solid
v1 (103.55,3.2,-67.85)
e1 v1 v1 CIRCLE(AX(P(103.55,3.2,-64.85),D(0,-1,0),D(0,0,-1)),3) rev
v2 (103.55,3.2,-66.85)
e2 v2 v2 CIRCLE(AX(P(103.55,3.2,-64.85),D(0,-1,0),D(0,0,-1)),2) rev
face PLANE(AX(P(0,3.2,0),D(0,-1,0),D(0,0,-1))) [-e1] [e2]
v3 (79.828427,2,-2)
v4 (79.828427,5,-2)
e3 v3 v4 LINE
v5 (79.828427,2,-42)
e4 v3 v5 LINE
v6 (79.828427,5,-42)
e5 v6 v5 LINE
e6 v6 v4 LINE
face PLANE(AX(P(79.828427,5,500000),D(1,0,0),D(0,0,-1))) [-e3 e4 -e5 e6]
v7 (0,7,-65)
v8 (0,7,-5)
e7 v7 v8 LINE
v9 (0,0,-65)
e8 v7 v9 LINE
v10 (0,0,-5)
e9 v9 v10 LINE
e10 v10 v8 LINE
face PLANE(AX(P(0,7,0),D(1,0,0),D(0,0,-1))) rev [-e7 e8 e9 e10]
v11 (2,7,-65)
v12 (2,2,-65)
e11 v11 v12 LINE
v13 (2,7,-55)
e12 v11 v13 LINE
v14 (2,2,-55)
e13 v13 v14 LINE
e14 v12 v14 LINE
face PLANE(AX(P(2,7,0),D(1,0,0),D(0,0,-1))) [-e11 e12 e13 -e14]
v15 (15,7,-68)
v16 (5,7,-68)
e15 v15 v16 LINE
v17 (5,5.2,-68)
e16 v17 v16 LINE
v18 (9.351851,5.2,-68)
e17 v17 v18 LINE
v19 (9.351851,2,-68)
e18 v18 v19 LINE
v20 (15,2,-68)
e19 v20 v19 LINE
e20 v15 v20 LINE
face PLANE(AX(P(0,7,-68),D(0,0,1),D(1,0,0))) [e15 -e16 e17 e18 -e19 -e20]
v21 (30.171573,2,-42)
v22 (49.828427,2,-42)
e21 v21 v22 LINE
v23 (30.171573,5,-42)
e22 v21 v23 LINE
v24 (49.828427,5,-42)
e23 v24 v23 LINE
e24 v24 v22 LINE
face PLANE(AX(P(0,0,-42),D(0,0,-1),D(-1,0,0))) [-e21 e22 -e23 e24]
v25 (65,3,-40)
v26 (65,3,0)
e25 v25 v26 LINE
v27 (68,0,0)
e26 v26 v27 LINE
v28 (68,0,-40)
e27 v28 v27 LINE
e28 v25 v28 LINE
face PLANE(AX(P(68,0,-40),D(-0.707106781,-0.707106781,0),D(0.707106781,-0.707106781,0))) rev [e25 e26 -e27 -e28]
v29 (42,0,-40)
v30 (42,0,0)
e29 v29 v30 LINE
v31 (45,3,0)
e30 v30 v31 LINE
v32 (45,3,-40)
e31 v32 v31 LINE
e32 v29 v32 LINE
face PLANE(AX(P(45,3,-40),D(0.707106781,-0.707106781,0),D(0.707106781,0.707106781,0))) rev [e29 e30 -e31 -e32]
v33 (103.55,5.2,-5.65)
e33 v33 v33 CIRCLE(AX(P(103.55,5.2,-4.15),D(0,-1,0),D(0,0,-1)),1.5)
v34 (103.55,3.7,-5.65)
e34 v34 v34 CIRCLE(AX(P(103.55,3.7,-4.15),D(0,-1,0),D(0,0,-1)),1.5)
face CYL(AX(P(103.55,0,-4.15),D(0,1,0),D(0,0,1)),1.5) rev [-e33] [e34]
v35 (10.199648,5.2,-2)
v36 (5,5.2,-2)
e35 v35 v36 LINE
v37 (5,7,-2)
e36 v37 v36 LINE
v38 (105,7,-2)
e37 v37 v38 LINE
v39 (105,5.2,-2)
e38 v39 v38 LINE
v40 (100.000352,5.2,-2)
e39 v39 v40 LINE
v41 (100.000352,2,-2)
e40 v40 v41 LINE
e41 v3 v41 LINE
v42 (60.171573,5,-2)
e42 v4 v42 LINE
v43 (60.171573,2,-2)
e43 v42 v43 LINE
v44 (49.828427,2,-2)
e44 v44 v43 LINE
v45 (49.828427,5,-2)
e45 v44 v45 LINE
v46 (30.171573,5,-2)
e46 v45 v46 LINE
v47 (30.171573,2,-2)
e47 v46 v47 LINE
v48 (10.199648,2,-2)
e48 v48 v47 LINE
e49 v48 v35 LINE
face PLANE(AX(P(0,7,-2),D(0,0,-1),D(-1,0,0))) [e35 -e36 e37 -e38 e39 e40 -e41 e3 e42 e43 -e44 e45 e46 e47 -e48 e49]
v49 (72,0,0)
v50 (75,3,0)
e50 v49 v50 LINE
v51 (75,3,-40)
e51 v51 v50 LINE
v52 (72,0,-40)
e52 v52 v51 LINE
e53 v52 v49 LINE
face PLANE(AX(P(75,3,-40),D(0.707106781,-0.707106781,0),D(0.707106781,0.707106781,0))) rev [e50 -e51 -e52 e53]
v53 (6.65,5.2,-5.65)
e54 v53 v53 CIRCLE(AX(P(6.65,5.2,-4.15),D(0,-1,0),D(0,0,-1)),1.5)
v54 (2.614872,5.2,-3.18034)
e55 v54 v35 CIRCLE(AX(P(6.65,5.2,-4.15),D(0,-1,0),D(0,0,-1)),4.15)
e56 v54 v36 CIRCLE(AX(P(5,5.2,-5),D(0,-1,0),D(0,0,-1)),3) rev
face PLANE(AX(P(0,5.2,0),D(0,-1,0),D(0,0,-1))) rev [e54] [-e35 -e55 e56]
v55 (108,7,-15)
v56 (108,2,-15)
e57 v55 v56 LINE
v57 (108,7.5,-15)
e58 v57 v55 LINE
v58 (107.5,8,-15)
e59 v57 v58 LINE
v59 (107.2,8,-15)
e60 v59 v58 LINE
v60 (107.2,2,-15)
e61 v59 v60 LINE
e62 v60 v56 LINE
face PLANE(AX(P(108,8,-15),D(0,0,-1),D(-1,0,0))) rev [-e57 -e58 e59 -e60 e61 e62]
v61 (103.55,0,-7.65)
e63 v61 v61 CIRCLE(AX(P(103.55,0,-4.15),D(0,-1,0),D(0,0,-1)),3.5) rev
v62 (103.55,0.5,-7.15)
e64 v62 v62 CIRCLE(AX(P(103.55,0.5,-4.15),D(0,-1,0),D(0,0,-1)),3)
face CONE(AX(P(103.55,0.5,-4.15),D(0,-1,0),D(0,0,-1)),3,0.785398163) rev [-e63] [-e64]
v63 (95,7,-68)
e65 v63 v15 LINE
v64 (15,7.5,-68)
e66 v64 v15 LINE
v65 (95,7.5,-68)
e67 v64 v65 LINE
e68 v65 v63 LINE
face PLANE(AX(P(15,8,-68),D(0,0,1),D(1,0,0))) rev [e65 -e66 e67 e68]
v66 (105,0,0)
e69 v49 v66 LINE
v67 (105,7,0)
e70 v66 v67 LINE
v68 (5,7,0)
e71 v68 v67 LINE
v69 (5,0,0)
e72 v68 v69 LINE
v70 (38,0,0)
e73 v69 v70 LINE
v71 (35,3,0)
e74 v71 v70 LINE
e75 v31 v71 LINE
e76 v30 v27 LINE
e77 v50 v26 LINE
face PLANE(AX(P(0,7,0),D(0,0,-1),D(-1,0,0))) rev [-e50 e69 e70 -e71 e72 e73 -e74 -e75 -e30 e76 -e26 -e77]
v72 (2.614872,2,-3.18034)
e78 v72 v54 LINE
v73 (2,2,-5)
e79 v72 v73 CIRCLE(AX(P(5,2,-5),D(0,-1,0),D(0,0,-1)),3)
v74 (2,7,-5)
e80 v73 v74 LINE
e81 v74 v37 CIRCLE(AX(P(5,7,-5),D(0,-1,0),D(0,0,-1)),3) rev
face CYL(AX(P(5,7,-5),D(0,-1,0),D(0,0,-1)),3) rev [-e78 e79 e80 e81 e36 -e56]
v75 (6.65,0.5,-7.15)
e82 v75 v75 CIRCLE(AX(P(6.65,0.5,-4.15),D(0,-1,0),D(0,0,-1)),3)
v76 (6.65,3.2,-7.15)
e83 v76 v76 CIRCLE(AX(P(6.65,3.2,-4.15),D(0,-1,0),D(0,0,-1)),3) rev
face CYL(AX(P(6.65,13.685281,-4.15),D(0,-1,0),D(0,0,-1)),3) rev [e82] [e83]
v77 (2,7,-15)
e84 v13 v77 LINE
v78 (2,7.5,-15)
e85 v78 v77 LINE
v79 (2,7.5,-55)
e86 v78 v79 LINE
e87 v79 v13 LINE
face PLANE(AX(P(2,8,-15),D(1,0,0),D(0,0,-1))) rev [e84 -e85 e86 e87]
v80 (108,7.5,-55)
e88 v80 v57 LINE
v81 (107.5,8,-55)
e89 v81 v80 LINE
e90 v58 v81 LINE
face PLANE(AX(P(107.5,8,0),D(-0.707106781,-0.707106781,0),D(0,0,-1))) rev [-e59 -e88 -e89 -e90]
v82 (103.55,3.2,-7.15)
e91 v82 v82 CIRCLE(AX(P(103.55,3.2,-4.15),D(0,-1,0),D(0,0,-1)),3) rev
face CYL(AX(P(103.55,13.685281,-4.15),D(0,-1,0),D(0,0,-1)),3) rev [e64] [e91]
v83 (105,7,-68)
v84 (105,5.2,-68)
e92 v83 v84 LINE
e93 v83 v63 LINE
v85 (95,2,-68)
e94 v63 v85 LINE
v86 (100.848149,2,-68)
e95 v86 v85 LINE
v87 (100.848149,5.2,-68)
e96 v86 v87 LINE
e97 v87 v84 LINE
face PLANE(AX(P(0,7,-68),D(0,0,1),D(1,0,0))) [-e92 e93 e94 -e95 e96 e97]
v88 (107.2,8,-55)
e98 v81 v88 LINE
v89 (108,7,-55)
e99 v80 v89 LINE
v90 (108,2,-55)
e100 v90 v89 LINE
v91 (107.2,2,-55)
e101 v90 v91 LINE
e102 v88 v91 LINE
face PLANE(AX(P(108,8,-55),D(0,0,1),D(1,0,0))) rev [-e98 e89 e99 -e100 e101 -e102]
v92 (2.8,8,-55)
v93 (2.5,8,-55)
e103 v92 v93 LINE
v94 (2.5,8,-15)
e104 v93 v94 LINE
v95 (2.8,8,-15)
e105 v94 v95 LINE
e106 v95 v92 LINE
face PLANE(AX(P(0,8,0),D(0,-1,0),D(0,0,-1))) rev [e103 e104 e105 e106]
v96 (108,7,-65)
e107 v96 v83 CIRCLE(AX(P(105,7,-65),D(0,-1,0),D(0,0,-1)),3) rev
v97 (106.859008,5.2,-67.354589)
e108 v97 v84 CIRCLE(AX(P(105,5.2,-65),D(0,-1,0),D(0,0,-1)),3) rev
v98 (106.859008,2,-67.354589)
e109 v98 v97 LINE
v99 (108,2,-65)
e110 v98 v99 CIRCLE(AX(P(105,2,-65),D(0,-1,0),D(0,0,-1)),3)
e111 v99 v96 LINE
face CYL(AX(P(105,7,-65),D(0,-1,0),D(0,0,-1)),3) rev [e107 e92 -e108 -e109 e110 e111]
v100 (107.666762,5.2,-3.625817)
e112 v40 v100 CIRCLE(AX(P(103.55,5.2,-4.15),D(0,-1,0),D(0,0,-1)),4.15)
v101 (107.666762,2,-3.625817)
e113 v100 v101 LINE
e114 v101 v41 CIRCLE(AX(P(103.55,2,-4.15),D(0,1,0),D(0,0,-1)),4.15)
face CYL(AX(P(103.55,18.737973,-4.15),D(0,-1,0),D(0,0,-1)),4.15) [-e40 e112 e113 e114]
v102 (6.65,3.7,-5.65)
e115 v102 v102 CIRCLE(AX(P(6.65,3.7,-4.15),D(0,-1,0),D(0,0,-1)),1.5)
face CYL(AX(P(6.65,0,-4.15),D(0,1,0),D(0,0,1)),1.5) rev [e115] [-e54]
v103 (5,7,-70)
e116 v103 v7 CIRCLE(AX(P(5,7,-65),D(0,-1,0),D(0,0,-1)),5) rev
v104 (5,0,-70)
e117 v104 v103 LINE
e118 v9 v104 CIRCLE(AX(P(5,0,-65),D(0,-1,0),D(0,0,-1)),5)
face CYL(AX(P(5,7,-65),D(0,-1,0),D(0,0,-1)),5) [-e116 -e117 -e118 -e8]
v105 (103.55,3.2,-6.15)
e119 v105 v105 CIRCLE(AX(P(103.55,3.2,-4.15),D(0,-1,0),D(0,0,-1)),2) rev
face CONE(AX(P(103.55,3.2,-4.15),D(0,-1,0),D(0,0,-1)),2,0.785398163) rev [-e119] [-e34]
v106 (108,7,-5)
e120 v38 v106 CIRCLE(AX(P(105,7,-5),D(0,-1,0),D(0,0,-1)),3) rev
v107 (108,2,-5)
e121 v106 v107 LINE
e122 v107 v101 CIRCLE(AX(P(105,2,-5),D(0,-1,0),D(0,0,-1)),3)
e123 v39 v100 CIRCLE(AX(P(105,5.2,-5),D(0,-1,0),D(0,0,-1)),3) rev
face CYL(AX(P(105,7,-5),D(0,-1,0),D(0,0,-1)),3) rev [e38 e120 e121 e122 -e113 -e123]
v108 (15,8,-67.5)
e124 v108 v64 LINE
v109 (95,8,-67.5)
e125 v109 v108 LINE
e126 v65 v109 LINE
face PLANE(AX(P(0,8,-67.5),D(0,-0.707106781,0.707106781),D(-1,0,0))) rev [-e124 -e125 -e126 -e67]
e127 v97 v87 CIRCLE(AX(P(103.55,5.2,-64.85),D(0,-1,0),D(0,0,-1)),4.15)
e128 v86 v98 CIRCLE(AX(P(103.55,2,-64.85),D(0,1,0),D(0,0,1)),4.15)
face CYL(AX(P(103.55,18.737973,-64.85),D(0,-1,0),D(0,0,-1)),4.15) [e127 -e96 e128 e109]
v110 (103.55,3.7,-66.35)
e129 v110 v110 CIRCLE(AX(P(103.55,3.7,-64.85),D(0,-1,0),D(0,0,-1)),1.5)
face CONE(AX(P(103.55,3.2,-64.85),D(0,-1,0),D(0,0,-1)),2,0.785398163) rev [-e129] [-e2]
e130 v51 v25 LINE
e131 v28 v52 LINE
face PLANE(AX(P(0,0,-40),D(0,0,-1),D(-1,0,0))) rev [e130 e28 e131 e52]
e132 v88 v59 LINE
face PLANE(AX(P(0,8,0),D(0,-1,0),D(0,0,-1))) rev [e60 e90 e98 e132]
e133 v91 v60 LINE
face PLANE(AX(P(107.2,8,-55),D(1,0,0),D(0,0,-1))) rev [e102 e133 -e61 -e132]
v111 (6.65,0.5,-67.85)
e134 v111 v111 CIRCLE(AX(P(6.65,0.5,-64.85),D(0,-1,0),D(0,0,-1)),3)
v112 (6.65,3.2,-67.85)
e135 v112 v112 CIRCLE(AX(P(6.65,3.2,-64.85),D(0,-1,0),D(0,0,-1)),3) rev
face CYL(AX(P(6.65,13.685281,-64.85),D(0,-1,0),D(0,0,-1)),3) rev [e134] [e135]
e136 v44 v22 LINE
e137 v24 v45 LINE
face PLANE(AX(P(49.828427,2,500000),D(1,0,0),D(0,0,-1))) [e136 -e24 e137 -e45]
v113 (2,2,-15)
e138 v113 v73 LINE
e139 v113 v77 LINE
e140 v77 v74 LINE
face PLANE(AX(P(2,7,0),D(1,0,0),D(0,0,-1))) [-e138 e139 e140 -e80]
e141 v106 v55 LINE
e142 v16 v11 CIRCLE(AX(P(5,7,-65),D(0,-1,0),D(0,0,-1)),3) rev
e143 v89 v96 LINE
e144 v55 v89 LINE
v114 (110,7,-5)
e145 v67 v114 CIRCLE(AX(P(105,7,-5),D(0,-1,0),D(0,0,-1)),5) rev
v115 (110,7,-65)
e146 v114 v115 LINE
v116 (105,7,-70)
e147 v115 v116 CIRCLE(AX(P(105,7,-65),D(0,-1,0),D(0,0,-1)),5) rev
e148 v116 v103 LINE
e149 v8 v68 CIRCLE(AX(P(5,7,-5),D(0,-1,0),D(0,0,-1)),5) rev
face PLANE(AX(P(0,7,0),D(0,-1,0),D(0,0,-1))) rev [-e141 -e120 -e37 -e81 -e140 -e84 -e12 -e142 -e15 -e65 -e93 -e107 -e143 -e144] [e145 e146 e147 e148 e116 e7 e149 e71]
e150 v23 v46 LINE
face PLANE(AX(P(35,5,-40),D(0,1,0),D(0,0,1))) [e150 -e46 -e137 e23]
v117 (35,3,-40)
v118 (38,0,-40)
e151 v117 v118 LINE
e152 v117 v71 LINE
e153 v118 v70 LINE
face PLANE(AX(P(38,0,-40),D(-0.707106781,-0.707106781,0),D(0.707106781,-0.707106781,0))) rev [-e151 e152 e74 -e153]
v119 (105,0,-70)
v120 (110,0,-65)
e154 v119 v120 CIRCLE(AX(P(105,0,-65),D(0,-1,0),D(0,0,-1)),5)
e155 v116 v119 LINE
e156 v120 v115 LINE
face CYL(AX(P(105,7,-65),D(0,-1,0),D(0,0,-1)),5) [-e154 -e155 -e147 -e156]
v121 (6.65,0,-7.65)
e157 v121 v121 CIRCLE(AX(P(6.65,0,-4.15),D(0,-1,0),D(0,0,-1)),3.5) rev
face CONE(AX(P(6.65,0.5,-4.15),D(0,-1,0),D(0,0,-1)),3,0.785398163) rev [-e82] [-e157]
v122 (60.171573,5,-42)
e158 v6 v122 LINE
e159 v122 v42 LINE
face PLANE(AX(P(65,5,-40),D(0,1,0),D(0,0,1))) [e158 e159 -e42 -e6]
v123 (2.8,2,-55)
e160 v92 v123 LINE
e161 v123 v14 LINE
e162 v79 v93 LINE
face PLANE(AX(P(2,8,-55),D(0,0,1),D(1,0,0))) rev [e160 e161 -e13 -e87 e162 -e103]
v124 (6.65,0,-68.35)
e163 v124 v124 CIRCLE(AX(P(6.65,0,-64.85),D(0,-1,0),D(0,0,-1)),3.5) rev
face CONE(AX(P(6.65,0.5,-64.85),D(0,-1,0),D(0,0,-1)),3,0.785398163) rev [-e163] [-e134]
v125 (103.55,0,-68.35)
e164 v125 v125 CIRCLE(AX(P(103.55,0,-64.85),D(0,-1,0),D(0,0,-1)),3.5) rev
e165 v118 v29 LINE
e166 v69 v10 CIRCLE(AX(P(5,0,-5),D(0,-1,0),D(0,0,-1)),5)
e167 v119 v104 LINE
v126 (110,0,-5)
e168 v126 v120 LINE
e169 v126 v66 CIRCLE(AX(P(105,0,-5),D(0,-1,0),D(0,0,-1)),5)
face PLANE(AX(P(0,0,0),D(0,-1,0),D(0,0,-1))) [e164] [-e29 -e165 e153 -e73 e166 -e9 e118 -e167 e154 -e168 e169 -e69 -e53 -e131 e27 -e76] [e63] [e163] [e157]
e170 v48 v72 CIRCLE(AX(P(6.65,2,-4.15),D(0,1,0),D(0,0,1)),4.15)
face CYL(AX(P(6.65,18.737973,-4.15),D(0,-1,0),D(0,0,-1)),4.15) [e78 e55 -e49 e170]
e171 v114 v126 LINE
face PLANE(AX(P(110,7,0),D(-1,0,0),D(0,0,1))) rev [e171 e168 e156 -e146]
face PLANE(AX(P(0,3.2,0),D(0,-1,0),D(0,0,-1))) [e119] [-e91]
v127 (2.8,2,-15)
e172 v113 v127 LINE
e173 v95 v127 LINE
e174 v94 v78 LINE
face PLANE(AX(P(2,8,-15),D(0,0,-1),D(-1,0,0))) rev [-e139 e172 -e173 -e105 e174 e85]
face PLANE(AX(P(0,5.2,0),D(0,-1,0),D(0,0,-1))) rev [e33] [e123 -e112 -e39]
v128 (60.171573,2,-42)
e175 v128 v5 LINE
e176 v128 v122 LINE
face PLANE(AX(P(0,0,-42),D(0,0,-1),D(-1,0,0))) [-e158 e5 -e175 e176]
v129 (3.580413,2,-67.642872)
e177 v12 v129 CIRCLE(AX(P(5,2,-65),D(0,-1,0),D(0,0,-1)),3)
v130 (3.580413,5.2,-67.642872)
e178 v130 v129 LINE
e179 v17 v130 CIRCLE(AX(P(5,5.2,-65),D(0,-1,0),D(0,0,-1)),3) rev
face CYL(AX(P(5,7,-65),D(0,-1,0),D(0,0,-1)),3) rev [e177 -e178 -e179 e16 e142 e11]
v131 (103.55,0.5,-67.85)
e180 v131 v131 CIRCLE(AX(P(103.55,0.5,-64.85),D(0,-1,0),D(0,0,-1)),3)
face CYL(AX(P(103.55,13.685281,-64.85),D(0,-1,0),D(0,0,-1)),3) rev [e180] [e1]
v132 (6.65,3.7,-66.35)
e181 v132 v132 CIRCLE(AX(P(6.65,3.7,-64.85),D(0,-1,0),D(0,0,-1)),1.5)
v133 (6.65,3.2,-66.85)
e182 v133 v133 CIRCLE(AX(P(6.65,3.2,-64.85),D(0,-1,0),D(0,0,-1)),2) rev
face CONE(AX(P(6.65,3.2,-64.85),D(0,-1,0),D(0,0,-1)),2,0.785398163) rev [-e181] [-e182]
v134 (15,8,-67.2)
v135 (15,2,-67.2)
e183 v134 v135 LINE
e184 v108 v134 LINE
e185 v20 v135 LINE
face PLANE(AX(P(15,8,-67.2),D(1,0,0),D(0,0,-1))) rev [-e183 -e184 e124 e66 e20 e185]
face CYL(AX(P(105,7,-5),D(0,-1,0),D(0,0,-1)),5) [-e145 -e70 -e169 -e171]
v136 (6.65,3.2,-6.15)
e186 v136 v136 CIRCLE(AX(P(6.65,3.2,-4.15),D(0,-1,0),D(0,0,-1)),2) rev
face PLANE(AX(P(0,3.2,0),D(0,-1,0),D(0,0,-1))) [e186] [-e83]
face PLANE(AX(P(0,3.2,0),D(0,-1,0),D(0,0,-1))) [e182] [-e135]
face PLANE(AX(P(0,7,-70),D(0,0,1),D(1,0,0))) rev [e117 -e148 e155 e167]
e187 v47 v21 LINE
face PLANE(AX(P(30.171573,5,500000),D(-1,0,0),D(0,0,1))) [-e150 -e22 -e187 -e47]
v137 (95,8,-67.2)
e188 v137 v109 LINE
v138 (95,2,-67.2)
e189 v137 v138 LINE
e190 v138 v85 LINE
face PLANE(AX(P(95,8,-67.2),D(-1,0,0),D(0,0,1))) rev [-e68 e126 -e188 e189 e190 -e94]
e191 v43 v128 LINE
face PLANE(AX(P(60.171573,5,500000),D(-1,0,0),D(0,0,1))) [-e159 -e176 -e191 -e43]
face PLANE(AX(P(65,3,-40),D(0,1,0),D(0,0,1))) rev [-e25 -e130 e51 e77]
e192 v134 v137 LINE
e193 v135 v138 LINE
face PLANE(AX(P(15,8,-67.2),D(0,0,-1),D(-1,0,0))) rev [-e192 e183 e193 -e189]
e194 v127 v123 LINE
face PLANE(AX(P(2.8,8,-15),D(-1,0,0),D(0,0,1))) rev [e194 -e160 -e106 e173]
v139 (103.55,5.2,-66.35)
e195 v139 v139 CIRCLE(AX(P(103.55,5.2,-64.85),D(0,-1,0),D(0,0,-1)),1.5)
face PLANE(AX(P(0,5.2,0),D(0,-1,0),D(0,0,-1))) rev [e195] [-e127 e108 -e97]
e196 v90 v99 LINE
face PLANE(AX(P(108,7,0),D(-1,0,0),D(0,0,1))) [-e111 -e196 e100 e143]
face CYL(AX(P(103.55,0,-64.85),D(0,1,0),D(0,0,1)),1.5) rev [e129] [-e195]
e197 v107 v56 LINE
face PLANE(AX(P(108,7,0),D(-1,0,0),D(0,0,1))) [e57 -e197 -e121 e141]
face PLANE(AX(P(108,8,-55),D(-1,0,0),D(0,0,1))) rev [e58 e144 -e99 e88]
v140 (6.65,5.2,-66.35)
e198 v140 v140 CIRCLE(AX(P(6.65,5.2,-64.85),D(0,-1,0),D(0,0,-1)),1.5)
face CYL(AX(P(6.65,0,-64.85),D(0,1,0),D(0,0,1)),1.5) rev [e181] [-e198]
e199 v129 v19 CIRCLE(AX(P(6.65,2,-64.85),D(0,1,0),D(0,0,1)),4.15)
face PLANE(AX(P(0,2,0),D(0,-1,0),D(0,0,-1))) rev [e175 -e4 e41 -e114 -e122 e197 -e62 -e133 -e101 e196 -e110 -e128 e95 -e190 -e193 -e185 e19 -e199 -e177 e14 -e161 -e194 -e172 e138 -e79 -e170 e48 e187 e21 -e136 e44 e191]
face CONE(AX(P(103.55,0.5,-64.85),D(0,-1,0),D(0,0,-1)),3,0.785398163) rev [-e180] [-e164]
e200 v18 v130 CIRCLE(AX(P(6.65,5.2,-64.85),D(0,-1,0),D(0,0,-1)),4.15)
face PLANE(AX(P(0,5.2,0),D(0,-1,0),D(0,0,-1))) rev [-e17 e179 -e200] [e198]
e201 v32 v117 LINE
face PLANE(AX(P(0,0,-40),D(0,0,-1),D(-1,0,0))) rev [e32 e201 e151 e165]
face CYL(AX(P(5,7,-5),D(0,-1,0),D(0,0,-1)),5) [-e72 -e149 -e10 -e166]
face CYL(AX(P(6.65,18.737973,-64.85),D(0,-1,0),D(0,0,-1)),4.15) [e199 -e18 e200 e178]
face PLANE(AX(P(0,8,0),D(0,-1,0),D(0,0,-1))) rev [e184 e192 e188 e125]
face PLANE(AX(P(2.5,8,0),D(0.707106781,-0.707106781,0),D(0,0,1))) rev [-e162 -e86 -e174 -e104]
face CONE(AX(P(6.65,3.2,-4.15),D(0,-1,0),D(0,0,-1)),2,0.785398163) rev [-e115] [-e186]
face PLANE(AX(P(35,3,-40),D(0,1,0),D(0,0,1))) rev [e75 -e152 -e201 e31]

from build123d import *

# Parameters (mm, degrees)
SKETCH1_W               = 110
SKETCH1_H               = 70
BOSS_EXTRUDE1_DEPTH     = 7
FILLET1_R               = 5
CUT_EXTRUDE1_DEPTH      = 40
SHELL1_START            = 5
SHELL1_DEPTH            = 2
SHELL1_START_2          = 2
SHELL1_2_DEPTH          = 3
SHELL1_START_3          = -42
SHELL1_3_DEPTH          = 40
SHELL1_4_DEPTH          = 2
SKETCH2_W               = 80
SKETCH2_H               = 0.8
SKETCH2_W_2             = 0.8
SKETCH2_H_2             = 40
BOSS_EXTRUDE2_DEPTH     = 6
CHAMFER1_SIZE           = 0.5
SKETCH8_R               = 4.15
BOSS_EXTRUDE3_DEPTH     = 3.2
CUT_EXTRUDE5_DEPTH      = 131.48770057
CUT_EXTRUDE5_DEPTH_BACK = 131.48770057
SKETCH9_R               = 1.5
SKETCH10_R              = 3
CUT_EXTRUDE6_DEPTH      = 3.2
CHAMFER2_SIZE           = 0.5
BOSS_EXTRUDE4_REACH     = 120.017


with BuildPart() as part:
    # Sketch1 → Boss-Extrude1 (new body)
    with BuildSketch(Plane(origin=(0, 0, 0), x_dir=(1, 0, 0), z_dir=(0, 1, 0))):
        with Locations((55, 35)):
            Rectangle(SKETCH1_W, SKETCH1_H)
    extrude(amount=BOSS_EXTRUDE1_DEPTH)

    # Fillet1
    fillet1_edges = [part.edges().sort_by_distance(p)[0] for p in [
        (0, 3.5, -70),
        (110, 3.5, -70),
        (110, 3.5, 0),
        (0, 3.5, 0),
    ]]
    fillet(fillet1_edges, radius=FILLET1_R)

    # Sketch3 → Cut-Extrude1 (cut)
    with BuildSketch(Plane.XY):
        Polygon((38, 0), (35, 3), (45, 3), (42, 0), align=None)
        Polygon((68, 0), (65, 3), (75, 3), (72, 0), align=None)
    extrude(amount=-CUT_EXTRUDE1_DEPTH, mode=Mode.SUBTRACT)

    # Shell1: read off the stored shape, not the designer's step
    # Shell1 outline → Shell1 (cut)
    with BuildSketch(Plane(origin=(0, 0, 0), x_dir=(1, 0, 0), z_dir=(0, 1, 0)).offset(SHELL1_START)):
        with BuildLine():
            Line((2, 65), (2, 5))
            ThreePointArc((2, 5), (2.878679656, 2.878679656), (5, 2))
            Line((5, 2), (105, 2))
            ThreePointArc((105, 2), (107.121320344, 2.878679656), (108, 5))
            Line((108, 5), (108, 65))
            ThreePointArc((108, 65), (107.121320344, 67.121320344), (105, 68))
            Line((105, 68), (5, 68))
            ThreePointArc((5, 68), (2.878679656, 67.121320344), (2, 65))
        make_face()
    extrude(amount=SHELL1_DEPTH, mode=Mode.SUBTRACT)

    # Shell1 2 outline → Shell1 2 (cut)
    with BuildSketch(Plane(origin=(0, 0, 0), x_dir=(1, 0, 0), z_dir=(0, 1, 0)).offset(SHELL1_START_2)):
        with BuildLine():
            Line((2, 65), (2, 5))
            ThreePointArc((2, 5), (2.878679656, 2.878679656), (5, 2))
            Line((5, 2), (105, 2))
            ThreePointArc((105, 2), (107.121320344, 2.878679656), (108, 5))
            Line((108, 5), (108, 65))
            ThreePointArc((108, 65), (107.121320344, 67.121320344), (105, 68))
            Line((105, 68), (5, 68))
            ThreePointArc((5, 68), (2.878679656, 67.121320344), (2, 65))
        make_face()
    extrude(amount=SHELL1_2_DEPTH, mode=Mode.SUBTRACT)

    # Shell1 3 outline → Shell1 3 (add)
    with BuildSketch(Plane.XY.offset(SHELL1_START_3)):
        Polygon((36, 2), (35, 3), (45, 3), (44, 2), (46.828427125, 2), (49.828427125, 5), (30.171572875, 5), (33.171572875, 2), align=None)
        Polygon((60.171572875, 5), (63.171572875, 2), (66, 2), (65, 3), (75, 3), (74, 2), (76.828427125, 2), (79.828427125, 5), align=None)
    extrude(amount=SHELL1_3_DEPTH)

    # Shell1 4 outline → Shell1 4 (add)
    with BuildSketch(Plane.XY.offset(SHELL1_START_3)):
        Polygon((45, 3), (35, 3), (36, 2), (44, 2), align=None)
        Polygon((65, 3), (66, 2), (74, 2), (75, 3), align=None)
    extrude(amount=SHELL1_4_DEPTH)

    # Sketch2 → Boss-Extrude2 (add)
    with BuildSketch(Plane(origin=(0, 2, 0), x_dir=(1, 0, 0), z_dir=(0, 1, 0))):
        with Locations((55, 67.6)):
            Rectangle(SKETCH2_W, SKETCH2_H)
        with Locations((107.6, 35)):
            Rectangle(SKETCH2_W_2, SKETCH2_H_2)
        with Locations((2.4, 35)):
            Rectangle(SKETCH2_W_2, SKETCH2_H_2)
    extrude(amount=BOSS_EXTRUDE2_DEPTH)

    # Chamfer1
    chamfer1_edges = [part.edges().sort_by_distance(p)[0] for p in [
        (55, 8, -68),
        (108, 8, -35),
        (2, 8, -35),
    ]]
    chamfer(chamfer1_edges, length=CHAMFER1_SIZE)

    # Sketch8 → Boss-Extrude3 (add)
    with BuildSketch(Plane(origin=(0, 2, 0), x_dir=(1, 0, 0), z_dir=(0, 1, 0))):
        with Locations((103.55, 64.85)):
            Circle(SKETCH8_R)
        with Locations((6.65, 64.85)):
            Circle(SKETCH8_R)
        with Locations((6.65, 4.15)):
            Circle(SKETCH8_R)
        with Locations((103.55, 4.15)):
            Circle(SKETCH8_R)
    extrude(amount=BOSS_EXTRUDE3_DEPTH)

    # Sketch9 → Cut-Extrude5 (cut, two sides: drawn at the far end of the back side and taken through both)
    with BuildSketch(Plane(origin=(0, 5.2, 0), x_dir=(1, 0, 0), z_dir=(0, 1, 0)).offset(-CUT_EXTRUDE5_DEPTH_BACK)):
        with Locations(Location((6.65, 64.85, 0), (0, 0, 270))):
            Circle(SKETCH9_R)
        with Locations(Location((6.65, 4.15, 0), (0, 0, 270))):
            Circle(SKETCH9_R)
        with Locations(Location((103.55, 4.15, 0), (0, 0, 270))):
            Circle(SKETCH9_R)
        with Locations(Location((103.55, 64.85, 0), (0, 0, 270))):
            Circle(SKETCH9_R)
    extrude(amount=CUT_EXTRUDE5_DEPTH + CUT_EXTRUDE5_DEPTH_BACK, mode=Mode.SUBTRACT)

    # Sketch10 → Cut-Extrude6 (cut)
    with BuildSketch(Plane(origin=(0, 0, 0), x_dir=(-1, 0, 0), z_dir=(0, -1, 0))):
        with Locations(Location((-6.65, 4.15, 0), (0, 0, 90))):
            Circle(SKETCH10_R)
        with Locations(Location((-6.65, 64.85, 0), (0, 0, 90))):
            Circle(SKETCH10_R)
        with Locations(Location((-103.55, 64.85, 0), (0, 0, 90))):
            Circle(SKETCH10_R)
        with Locations(Location((-103.55, 4.15, 0), (0, 0, 90))):
            Circle(SKETCH10_R)
    extrude(amount=-CUT_EXTRUDE6_DEPTH, mode=Mode.SUBTRACT)

    # Chamfer2
    chamfer2_edges = [part.edges().sort_by_distance(p)[0] for p in [
        (6.65, 0, -1.15),
        (6.65, 3.2, -5.65),
        (6.65, 0, -61.85),
        (6.65, 3.2, -66.35),
        (103.55, 0, -61.85),
        (103.55, 3.2, -66.35),
        (103.55, 0, -1.15),
        (103.55, 3.2, -5.65),
    ]]
    chamfer(chamfer2_edges, length=CHAMFER2_SIZE)

    # Sketch11 → Boss-Extrude4 (add, up to next)
    with BuildSketch(Plane(origin=(0, 0, -42), x_dir=(-1, 0, 0), z_dir=(0, 0, -1)), mode=Mode.PRIVATE) as boss_extrude4_sk1:
        Polygon((-60.171572875, 5), (-60.171572875, 2), (-63.171572875, 2), align=None)
    boss_extrude4_tool1 = extrude(boss_extrude4_sk1.sketch, amount=-BOSS_EXTRUDE4_REACH, mode=Mode.PRIVATE) - part.part
    # Sketch11 → Boss-Extrude4 (add, up to next)
    with BuildSketch(Plane(origin=(0, 0, -42), x_dir=(-1, 0, 0), z_dir=(0, 0, -1)), mode=Mode.PRIVATE) as boss_extrude4_sk2:
        Polygon((-49.828427125, 5), (-46.828427125, 2), (-49.828427125, 2), align=None)
    boss_extrude4_tool2 = extrude(boss_extrude4_sk2.sketch, amount=-BOSS_EXTRUDE4_REACH, mode=Mode.PRIVATE) - part.part
    # Sketch11 → Boss-Extrude4 (add, up to next)
    with BuildSketch(Plane(origin=(0, 0, -42), x_dir=(-1, 0, 0), z_dir=(0, 0, -1)), mode=Mode.PRIVATE) as boss_extrude4_sk3:
        Polygon((-33.171572875, 2), (-30.171572875, 5), (-30.171572875, 2), align=None)
    boss_extrude4_tool3 = extrude(boss_extrude4_sk3.sketch, amount=-BOSS_EXTRUDE4_REACH, mode=Mode.PRIVATE) - part.part
    # Sketch11 → Boss-Extrude4 (add, up to next)
    with BuildSketch(Plane(origin=(0, 0, -42), x_dir=(-1, 0, 0), z_dir=(0, 0, -1)), mode=Mode.PRIVATE) as boss_extrude4_sk4:
        Polygon((-79.828427125, 5), (-79.828427125, 2), (-76.828427125, 2), align=None)
    boss_extrude4_tool4 = extrude(boss_extrude4_sk4.sketch, amount=-BOSS_EXTRUDE4_REACH, mode=Mode.PRIVATE) - part.part
    add(boss_extrude4_tool1.solids().sort_by_distance((61.171573, 3, -42))[0])
    add(boss_extrude4_tool2.solids().sort_by_distance((48.828427, 3, -42))[0])
    add(boss_extrude4_tool3.solids().sort_by_distance((31.171573, 3, -42))[0])
    add(boss_extrude4_tool4.solids().sort_by_distance((78.828427, 3, -42))[0])


solid = part.part
